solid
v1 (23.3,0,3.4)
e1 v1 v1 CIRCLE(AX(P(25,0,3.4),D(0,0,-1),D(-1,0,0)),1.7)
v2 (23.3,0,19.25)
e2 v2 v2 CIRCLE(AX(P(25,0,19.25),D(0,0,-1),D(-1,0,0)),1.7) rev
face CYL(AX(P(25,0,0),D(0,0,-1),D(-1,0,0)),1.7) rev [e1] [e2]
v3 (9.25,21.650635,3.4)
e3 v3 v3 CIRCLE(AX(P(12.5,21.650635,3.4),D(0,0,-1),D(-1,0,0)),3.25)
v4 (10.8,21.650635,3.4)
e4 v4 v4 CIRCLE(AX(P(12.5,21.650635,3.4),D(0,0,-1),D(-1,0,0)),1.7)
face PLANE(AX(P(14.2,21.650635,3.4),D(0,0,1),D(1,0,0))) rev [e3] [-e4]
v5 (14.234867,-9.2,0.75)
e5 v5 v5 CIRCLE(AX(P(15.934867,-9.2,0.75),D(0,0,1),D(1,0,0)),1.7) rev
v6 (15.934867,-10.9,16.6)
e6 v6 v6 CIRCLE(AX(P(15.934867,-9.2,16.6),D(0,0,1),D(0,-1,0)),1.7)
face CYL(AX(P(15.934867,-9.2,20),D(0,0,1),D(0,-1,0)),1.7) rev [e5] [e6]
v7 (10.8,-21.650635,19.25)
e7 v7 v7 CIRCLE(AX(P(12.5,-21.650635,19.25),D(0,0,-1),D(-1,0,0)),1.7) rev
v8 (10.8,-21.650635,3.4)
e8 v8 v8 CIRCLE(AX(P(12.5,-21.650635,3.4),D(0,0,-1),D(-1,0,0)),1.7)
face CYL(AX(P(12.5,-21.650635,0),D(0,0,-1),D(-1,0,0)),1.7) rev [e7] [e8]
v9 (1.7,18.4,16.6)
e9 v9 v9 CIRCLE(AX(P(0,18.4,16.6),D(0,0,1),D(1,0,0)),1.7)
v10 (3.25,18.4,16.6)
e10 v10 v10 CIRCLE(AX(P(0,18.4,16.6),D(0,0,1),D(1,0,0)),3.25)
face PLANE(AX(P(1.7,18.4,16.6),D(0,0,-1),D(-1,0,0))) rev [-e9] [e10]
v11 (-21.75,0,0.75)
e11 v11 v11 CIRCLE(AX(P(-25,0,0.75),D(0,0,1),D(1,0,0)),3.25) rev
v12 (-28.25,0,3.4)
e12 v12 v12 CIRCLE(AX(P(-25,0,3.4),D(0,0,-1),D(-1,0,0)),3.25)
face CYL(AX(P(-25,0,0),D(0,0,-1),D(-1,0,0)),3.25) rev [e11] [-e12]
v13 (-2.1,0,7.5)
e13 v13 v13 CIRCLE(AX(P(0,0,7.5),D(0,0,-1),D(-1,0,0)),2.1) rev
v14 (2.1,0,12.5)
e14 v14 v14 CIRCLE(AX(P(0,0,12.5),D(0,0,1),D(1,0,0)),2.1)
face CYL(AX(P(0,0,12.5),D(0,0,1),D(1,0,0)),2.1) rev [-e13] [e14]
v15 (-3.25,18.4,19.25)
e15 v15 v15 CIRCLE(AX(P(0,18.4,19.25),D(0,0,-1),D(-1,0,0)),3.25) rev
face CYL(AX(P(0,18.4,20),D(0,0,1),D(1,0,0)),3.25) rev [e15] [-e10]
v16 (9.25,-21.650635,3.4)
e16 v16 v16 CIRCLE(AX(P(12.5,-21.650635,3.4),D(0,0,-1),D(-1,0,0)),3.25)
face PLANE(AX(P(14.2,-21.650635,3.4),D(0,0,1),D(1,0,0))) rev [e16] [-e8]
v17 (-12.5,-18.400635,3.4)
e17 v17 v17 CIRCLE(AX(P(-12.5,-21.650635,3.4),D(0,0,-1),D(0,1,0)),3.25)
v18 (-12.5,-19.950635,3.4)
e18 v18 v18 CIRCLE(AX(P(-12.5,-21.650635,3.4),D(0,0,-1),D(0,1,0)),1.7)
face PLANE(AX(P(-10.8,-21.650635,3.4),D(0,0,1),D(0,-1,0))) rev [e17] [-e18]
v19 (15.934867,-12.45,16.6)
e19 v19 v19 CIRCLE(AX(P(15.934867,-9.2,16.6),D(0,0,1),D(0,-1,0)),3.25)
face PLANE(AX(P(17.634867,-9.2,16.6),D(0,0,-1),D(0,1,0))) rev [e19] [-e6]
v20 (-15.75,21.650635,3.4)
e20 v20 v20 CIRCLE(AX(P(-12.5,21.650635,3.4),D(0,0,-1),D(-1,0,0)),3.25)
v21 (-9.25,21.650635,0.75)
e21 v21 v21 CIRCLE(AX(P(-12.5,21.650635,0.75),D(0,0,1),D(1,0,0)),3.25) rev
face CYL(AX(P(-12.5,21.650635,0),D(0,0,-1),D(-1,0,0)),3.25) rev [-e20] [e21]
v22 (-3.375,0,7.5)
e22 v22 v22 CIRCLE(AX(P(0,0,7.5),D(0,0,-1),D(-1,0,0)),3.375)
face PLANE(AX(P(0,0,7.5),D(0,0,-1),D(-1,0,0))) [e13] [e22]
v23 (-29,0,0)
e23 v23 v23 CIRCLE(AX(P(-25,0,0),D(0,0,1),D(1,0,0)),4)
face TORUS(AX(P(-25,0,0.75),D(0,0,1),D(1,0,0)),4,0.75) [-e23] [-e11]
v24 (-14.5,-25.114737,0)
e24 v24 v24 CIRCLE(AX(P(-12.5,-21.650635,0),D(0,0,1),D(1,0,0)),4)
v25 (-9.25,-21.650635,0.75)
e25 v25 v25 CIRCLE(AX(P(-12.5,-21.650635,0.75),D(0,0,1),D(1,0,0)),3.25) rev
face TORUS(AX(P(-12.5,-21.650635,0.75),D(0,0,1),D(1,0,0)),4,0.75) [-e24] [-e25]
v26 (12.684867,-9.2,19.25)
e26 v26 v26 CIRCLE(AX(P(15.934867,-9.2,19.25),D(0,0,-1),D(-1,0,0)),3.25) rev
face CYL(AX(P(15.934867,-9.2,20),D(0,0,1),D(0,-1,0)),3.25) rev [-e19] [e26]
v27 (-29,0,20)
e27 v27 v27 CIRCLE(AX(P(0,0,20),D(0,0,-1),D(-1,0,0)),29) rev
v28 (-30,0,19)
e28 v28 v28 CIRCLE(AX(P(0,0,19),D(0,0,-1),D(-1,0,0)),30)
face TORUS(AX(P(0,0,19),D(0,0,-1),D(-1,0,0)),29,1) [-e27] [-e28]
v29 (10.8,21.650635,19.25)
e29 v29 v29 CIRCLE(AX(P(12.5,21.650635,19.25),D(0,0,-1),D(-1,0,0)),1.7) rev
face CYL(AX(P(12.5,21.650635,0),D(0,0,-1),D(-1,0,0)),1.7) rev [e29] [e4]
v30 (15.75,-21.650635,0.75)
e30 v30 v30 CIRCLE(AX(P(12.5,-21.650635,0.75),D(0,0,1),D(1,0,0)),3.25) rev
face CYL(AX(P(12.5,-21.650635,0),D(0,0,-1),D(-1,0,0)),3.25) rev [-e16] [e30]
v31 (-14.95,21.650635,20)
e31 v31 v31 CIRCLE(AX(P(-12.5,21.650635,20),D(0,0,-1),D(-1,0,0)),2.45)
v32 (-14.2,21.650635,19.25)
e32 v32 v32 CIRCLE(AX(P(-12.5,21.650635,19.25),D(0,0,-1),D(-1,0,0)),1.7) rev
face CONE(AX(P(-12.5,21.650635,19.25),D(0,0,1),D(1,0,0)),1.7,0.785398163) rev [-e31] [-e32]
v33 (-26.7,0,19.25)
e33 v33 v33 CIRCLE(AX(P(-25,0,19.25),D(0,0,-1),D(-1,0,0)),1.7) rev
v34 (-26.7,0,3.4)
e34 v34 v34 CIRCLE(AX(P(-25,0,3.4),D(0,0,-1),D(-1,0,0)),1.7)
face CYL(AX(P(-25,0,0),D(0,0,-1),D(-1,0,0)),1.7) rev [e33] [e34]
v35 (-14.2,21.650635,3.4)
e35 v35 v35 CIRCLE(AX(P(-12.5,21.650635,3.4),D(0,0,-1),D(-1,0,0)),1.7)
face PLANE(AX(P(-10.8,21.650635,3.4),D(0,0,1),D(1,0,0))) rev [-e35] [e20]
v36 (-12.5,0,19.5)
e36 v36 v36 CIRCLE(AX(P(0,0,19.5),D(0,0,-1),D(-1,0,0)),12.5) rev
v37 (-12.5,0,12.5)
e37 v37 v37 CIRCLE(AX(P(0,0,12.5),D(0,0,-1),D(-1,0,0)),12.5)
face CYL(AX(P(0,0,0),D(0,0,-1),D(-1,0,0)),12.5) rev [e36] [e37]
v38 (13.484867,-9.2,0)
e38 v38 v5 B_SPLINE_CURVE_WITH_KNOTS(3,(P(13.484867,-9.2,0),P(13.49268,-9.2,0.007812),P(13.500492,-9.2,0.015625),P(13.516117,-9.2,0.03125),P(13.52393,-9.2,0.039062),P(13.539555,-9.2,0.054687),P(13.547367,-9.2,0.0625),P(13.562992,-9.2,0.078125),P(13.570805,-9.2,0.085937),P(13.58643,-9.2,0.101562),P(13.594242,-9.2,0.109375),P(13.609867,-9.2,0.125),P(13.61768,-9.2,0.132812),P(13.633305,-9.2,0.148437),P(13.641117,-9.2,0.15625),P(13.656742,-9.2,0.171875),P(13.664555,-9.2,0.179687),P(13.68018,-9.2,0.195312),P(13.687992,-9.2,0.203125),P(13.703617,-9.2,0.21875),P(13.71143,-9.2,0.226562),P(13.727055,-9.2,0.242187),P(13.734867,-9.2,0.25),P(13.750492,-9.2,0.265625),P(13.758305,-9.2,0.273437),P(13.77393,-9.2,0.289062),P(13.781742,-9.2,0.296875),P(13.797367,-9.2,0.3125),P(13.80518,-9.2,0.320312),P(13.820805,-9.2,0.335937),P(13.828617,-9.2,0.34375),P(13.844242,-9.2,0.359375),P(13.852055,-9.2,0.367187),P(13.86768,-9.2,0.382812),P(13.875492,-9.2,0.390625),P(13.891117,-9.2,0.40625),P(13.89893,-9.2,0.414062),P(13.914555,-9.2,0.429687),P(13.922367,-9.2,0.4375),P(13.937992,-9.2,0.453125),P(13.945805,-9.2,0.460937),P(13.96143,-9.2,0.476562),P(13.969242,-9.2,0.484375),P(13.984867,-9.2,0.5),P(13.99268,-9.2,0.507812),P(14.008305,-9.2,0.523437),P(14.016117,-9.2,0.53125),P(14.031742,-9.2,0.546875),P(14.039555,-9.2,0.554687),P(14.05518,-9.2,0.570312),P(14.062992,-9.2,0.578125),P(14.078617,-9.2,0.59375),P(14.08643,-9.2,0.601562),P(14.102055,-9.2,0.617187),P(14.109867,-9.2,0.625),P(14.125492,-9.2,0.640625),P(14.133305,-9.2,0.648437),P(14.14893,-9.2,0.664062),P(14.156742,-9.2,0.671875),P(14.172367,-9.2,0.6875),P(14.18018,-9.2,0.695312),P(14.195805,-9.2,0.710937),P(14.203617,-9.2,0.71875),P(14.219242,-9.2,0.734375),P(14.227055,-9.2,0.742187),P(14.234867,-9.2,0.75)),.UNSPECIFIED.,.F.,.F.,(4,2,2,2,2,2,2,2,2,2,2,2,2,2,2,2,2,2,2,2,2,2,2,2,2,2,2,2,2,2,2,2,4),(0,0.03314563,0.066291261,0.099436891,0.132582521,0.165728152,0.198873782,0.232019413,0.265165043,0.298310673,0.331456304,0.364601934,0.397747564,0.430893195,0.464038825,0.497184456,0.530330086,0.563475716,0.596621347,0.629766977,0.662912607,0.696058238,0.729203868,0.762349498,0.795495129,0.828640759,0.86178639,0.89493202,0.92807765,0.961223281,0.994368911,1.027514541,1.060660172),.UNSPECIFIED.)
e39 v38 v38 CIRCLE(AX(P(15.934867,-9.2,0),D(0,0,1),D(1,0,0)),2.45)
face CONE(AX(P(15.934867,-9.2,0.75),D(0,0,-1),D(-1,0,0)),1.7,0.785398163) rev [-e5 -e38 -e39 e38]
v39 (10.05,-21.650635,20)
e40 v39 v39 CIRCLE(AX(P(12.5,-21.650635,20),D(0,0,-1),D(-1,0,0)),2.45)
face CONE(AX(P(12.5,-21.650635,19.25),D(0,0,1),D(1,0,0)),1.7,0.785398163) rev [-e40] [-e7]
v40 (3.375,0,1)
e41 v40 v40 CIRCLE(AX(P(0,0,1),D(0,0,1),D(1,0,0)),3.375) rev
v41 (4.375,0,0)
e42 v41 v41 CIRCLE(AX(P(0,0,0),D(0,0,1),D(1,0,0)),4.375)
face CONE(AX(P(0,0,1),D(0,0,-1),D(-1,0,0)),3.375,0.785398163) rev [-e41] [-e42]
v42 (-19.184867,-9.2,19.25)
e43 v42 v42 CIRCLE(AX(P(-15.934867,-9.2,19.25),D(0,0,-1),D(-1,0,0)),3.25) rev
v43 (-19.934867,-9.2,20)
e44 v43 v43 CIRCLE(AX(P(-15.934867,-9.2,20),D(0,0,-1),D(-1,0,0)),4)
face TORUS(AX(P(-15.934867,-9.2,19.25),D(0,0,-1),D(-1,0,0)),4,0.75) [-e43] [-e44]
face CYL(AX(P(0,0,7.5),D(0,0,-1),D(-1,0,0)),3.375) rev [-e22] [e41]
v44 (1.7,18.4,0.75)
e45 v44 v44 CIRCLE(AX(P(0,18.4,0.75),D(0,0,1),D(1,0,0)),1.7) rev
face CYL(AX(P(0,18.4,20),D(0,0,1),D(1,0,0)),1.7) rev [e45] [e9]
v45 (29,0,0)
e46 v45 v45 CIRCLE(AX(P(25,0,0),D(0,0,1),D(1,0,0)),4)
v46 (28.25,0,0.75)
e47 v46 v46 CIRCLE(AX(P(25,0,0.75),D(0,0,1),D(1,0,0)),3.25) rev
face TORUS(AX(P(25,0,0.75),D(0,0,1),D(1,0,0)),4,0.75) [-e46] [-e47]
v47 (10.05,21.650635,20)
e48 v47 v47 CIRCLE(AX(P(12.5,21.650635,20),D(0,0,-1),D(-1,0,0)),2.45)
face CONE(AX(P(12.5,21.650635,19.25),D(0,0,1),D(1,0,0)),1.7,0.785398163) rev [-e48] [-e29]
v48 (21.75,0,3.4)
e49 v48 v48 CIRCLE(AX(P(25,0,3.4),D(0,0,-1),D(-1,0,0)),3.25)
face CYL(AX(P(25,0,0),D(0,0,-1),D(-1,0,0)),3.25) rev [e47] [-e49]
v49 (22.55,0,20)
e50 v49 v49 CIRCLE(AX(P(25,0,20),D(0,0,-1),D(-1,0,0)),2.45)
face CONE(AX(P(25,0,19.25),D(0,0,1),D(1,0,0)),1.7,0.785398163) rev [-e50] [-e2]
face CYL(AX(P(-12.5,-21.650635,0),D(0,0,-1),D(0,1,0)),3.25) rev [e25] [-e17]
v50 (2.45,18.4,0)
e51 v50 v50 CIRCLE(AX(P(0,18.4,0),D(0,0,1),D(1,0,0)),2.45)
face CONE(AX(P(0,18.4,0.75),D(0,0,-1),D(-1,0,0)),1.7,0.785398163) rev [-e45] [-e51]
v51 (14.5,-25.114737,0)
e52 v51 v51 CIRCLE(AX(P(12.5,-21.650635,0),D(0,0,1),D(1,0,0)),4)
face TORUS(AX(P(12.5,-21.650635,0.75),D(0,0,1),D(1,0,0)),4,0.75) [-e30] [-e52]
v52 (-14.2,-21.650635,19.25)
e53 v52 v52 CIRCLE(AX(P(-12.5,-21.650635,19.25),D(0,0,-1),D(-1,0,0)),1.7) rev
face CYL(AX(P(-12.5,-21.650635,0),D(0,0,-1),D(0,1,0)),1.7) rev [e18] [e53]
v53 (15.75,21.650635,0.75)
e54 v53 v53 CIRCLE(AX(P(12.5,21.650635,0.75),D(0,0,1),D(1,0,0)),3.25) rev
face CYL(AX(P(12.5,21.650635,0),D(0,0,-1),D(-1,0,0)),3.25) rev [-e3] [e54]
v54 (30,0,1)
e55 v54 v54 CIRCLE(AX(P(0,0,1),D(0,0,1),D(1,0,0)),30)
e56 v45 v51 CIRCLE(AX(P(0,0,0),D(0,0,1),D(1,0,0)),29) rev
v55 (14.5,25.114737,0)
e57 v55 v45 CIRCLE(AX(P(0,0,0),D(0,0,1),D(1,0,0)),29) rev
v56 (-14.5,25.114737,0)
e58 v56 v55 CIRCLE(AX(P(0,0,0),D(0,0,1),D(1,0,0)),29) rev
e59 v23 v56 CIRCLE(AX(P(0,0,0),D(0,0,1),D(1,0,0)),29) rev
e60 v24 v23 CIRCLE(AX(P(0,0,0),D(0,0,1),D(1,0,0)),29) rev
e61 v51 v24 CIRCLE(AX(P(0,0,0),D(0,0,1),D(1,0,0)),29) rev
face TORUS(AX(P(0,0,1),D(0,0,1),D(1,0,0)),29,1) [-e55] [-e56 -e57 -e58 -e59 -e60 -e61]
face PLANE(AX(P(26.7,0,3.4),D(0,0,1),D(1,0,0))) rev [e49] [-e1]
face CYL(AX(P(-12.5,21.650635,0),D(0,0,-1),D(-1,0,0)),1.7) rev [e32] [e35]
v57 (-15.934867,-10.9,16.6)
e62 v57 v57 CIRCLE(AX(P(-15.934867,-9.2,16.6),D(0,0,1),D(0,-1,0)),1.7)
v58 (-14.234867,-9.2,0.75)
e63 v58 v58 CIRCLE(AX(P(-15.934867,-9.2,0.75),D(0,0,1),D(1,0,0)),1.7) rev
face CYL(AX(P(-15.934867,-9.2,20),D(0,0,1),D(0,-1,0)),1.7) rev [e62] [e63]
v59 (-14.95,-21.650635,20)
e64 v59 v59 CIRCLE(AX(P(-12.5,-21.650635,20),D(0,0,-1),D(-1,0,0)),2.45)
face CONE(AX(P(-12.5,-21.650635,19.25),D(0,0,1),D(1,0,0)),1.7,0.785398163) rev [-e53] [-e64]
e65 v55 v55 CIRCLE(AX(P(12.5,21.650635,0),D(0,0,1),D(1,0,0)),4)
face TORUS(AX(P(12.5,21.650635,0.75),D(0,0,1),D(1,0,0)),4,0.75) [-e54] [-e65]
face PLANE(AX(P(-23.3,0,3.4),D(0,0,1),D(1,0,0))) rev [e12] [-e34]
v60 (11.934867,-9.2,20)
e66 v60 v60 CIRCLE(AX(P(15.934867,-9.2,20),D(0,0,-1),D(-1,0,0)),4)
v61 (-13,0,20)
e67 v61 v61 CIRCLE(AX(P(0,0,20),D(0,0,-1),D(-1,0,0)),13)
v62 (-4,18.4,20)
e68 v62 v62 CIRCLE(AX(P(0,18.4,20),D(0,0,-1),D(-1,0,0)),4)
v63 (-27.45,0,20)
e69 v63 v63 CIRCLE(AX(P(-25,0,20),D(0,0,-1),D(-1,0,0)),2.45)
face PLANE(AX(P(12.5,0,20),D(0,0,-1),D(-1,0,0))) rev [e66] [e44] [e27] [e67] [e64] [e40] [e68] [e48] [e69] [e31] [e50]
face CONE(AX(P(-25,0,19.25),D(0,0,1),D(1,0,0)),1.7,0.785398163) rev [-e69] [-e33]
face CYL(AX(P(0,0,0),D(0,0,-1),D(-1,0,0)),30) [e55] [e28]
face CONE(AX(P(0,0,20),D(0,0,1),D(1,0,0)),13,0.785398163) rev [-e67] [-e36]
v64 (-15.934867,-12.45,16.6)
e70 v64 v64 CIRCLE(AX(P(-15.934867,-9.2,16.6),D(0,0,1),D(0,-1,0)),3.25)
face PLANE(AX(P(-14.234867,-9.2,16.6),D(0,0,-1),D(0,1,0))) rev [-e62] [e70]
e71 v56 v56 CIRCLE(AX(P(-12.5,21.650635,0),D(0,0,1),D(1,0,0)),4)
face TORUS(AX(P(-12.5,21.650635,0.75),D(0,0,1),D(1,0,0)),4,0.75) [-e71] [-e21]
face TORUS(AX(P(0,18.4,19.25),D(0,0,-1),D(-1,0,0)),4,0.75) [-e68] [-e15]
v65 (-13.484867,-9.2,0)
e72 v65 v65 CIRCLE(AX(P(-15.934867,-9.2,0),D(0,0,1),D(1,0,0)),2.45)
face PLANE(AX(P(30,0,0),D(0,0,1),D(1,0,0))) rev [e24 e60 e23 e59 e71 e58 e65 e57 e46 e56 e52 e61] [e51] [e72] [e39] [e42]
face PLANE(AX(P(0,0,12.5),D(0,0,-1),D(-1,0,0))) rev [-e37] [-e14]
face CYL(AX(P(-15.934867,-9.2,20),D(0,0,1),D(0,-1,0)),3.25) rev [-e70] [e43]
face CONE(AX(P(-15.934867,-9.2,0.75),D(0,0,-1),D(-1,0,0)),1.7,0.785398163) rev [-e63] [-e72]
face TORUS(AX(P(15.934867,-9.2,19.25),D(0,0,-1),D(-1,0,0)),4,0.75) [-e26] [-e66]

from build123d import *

# Parameters (mm, degrees)
STIRNSENKUNG_F_R_M3_ZYLINDERSCHRAUBE_MIT_D           = 3.4
STIRNSENKUNG_F_R_M3_ZYLINDERSCHRAUBE_MIT_CBORE_D     = 6.5
STIRNSENKUNG_F_R_M3_ZYLINDERSCHRAUBE_MIT_CBORE_DEPTH = 3.4
VERRUNDUNG1_R                                        = 0.75
FASE1_SIZE                                           = 0.75
KREISMUSTER1_COUNT                                   = 3
VERRUNDUNG1_OF_KREISMUSTER1_R                        = 0.75
FASE1_OF_KREISMUSTER1_SIZE                           = 0.75
STIRNSENKUNG_F_R_M3_ZYLINDERSCHRAUBE_2_D             = 3.4
STIRNSENKUNG_F_R_M3_ZYLINDERSCHRAUBE_2_CBORE_D       = 6.5
STIRNSENKUNG_F_R_M3_ZYLINDERSCHRAUBE_2_CBORE_DEPTH   = 3.4
VERRUNDUNG2_R                                        = 0.75
FASE2_SIZE                                           = 0.75
KREISMUSTER2_COUNT                                   = 6
VERRUNDUNG2_OF_KREISMUSTER2_R                        = 0.75
FASE2_OF_KREISMUSTER2_SIZE                           = 0.75
SKIZZE9_R                                            = 3.375
SCHNITT_LINEAR_AUSTRAGEN2_DEPTH                      = 7.5
FASE3_SIZE                                           = 0.5
FASE4_SIZE                                           = 1
VERRUNDUNG3_R                                        = 1
M5_GEWINDEBOHRUNG1_D                                 = 4.2


with BuildPart() as part:
    # Skizze1 → Rotation1 (revolve)
    with BuildSketch(Plane(origin=(0, 0, 0), x_dir=(1, 0, 0), z_dir=(0, 1, 0)), mode=Mode.PRIVATE) as rotation1_sk:
        Polygon((0, 0), (0, -12.5), (12.5, -12.5), (12.5, -20), (30, -20), (30, 0), align=None)
    revolve(rotation1_sk.sketch.rotate(Axis((0, 0, 0), (0, 0, 1)), 180), axis=Axis((0, 0, 0), (0, 0, 1)))

    # Stirnsenkung f_r M3 Zylinderschraube mit (through all)
    with Locations(Plane.XY.offset(20)):
        with Locations((0, 18.4)):
            stirnsenkung_f_r_m3_zylinderschraube_mit = CounterBoreHole(STIRNSENKUNG_F_R_M3_ZYLINDERSCHRAUBE_MIT_D / 2, STIRNSENKUNG_F_R_M3_ZYLINDERSCHRAUBE_MIT_CBORE_D / 2, STIRNSENKUNG_F_R_M3_ZYLINDERSCHRAUBE_MIT_CBORE_DEPTH)

    # Verrundung1
    verrundung1_edges = [part.edges().sort_by_distance(p)[0] for p in [
        (-3.25, 18.4, 20),
    ]]
    fillet(verrundung1_edges, radius=VERRUNDUNG1_R)

    # Fase1
    fase1_edges = [part.edges().sort_by_distance(p)[0] for p in [
        (1.7, 18.4, 0),
    ]]
    chamfer(fase1_edges, length=FASE1_SIZE)

    # Kreismuster1: Stirnsenkung f_r M3 Zylinderschraube mit ×3 about axis
    kreismuster1_axis = Axis((0, 0, 0), (0, 0, 1))
    for i in range(1, KREISMUSTER1_COUNT):
        add(stirnsenkung_f_r_m3_zylinderschraube_mit.rotate(kreismuster1_axis, i * 360 / KREISMUSTER1_COUNT), mode=Mode.SUBTRACT)

    # Verrundung1 of Kreismuster1
    verrundung1_of_kreismuster1_edges = [part.edges().sort_by_distance(p)[0] for p in [
        (-14.30986743, -12.014582562, 20),
        (17.55986743, -6.385417438, 20),
    ]]
    fillet(verrundung1_of_kreismuster1_edges, radius=VERRUNDUNG1_OF_KREISMUSTER1_R)

    # Fase1 of Kreismuster1
    fase1_of_kreismuster1_edges = [part.edges().sort_by_distance(p)[0] for p in [
        (-16.78486743, -7.727756814, 0),
        (15.08486743, -10.672243186, 0),
    ]]
    chamfer(fase1_of_kreismuster1_edges, length=FASE1_OF_KREISMUSTER1_SIZE)

    # Stirnsenkung f_r M3 Zylinderschraube 2 (through all)
    with Locations(Plane(origin=(0, 0, 0), x_dir=(-1, 0, 0), z_dir=(0, 0, -1))):
        with Locations((12.5, 21.650635095)):
            stirnsenkung_f_r_m3_zylinderschraube_2 = CounterBoreHole(STIRNSENKUNG_F_R_M3_ZYLINDERSCHRAUBE_2_D / 2, STIRNSENKUNG_F_R_M3_ZYLINDERSCHRAUBE_2_CBORE_D / 2, STIRNSENKUNG_F_R_M3_ZYLINDERSCHRAUBE_2_CBORE_DEPTH)

    # Verrundung2
    verrundung2_edges = [part.edges().sort_by_distance(p)[0] for p in [
        (-9.25, 21.650635095, 0),
    ]]
    fillet(verrundung2_edges, radius=VERRUNDUNG2_R)

    # Fase2
    fase2_edges = [part.edges().sort_by_distance(p)[0] for p in [
        (-14.2, 21.650635095, 20),
    ]]
    chamfer(fase2_edges, length=FASE2_SIZE)

    # Kreismuster2: Stirnsenkung f_r M3 Zylinderschraube 2 ×6 about axis
    kreismuster2_axis = Axis((0, 0, 0), (0, 0, 1))
    for i in range(1, KREISMUSTER2_COUNT):
        add(stirnsenkung_f_r_m3_zylinderschraube_2.rotate(kreismuster2_axis, i * 360 / KREISMUSTER2_COUNT), mode=Mode.SUBTRACT)

    # Verrundung2 of Kreismuster2
    verrundung2_of_kreismuster2_edges = [part.edges().sort_by_distance(p)[0] for p in [
        (-23.375, 2.814582562, 0),
        (-14.125, -18.836052533, 0),
        (9.25, -21.650635095, 0),
        (23.375, -2.814582562, 0),
        (14.125, 18.836052533, 0),
    ]]
    fillet(verrundung2_of_kreismuster2_edges, radius=VERRUNDUNG2_OF_KREISMUSTER2_R)

    # Fase2 of Kreismuster2
    fase2_of_kreismuster2_edges = [part.edges().sort_by_distance(p)[0] for p in [
        (-25.85, -1.472243186, 20),
        (-11.65, -23.122878281, 20),
        (14.2, -21.650635095, 20),
        (25.85, 1.472243186, 20),
        (11.65, 23.122878281, 20),
    ]]
    chamfer(fase2_of_kreismuster2_edges, length=FASE2_OF_KREISMUSTER2_SIZE)

    # Skizze9 → Schnitt-Linear austragen2 (cut)
    with BuildSketch(Plane(origin=(0, 0, 0), x_dir=(-1, 0, 0), z_dir=(0, 0, -1))):
        Circle(SKIZZE9_R)
    extrude(amount=-SCHNITT_LINEAR_AUSTRAGEN2_DEPTH, mode=Mode.SUBTRACT)

    # Fase3
    fase3_edges = [part.edges().sort_by_distance(p)[0] for p in [
        (12.5, 0, 20),
    ]]
    chamfer(fase3_edges, length=FASE3_SIZE)

    # Fase4
    fase4_edges = [part.edges().sort_by_distance(p)[0] for p in [
        (3.375, 0, 0),
    ]]
    chamfer(fase4_edges, length=FASE4_SIZE)

    # Verrundung3
    verrundung3_edges = [part.edges().sort_by_distance(p)[0] for p in [
        (30, 0, 0),
        (30, 0, 20),
    ]]
    fillet(verrundung3_edges, radius=VERRUNDUNG3_R - 0.0001)  # a hair under: the kernel refuses the full size

    # M5 Gewindebohrung1 (through all)
    with Locations(Plane.XY.offset(12.5)):
        with Locations((0, 0)):
            Hole(M5_GEWINDEBOHRUNG1_D / 2)


solid = part.part
